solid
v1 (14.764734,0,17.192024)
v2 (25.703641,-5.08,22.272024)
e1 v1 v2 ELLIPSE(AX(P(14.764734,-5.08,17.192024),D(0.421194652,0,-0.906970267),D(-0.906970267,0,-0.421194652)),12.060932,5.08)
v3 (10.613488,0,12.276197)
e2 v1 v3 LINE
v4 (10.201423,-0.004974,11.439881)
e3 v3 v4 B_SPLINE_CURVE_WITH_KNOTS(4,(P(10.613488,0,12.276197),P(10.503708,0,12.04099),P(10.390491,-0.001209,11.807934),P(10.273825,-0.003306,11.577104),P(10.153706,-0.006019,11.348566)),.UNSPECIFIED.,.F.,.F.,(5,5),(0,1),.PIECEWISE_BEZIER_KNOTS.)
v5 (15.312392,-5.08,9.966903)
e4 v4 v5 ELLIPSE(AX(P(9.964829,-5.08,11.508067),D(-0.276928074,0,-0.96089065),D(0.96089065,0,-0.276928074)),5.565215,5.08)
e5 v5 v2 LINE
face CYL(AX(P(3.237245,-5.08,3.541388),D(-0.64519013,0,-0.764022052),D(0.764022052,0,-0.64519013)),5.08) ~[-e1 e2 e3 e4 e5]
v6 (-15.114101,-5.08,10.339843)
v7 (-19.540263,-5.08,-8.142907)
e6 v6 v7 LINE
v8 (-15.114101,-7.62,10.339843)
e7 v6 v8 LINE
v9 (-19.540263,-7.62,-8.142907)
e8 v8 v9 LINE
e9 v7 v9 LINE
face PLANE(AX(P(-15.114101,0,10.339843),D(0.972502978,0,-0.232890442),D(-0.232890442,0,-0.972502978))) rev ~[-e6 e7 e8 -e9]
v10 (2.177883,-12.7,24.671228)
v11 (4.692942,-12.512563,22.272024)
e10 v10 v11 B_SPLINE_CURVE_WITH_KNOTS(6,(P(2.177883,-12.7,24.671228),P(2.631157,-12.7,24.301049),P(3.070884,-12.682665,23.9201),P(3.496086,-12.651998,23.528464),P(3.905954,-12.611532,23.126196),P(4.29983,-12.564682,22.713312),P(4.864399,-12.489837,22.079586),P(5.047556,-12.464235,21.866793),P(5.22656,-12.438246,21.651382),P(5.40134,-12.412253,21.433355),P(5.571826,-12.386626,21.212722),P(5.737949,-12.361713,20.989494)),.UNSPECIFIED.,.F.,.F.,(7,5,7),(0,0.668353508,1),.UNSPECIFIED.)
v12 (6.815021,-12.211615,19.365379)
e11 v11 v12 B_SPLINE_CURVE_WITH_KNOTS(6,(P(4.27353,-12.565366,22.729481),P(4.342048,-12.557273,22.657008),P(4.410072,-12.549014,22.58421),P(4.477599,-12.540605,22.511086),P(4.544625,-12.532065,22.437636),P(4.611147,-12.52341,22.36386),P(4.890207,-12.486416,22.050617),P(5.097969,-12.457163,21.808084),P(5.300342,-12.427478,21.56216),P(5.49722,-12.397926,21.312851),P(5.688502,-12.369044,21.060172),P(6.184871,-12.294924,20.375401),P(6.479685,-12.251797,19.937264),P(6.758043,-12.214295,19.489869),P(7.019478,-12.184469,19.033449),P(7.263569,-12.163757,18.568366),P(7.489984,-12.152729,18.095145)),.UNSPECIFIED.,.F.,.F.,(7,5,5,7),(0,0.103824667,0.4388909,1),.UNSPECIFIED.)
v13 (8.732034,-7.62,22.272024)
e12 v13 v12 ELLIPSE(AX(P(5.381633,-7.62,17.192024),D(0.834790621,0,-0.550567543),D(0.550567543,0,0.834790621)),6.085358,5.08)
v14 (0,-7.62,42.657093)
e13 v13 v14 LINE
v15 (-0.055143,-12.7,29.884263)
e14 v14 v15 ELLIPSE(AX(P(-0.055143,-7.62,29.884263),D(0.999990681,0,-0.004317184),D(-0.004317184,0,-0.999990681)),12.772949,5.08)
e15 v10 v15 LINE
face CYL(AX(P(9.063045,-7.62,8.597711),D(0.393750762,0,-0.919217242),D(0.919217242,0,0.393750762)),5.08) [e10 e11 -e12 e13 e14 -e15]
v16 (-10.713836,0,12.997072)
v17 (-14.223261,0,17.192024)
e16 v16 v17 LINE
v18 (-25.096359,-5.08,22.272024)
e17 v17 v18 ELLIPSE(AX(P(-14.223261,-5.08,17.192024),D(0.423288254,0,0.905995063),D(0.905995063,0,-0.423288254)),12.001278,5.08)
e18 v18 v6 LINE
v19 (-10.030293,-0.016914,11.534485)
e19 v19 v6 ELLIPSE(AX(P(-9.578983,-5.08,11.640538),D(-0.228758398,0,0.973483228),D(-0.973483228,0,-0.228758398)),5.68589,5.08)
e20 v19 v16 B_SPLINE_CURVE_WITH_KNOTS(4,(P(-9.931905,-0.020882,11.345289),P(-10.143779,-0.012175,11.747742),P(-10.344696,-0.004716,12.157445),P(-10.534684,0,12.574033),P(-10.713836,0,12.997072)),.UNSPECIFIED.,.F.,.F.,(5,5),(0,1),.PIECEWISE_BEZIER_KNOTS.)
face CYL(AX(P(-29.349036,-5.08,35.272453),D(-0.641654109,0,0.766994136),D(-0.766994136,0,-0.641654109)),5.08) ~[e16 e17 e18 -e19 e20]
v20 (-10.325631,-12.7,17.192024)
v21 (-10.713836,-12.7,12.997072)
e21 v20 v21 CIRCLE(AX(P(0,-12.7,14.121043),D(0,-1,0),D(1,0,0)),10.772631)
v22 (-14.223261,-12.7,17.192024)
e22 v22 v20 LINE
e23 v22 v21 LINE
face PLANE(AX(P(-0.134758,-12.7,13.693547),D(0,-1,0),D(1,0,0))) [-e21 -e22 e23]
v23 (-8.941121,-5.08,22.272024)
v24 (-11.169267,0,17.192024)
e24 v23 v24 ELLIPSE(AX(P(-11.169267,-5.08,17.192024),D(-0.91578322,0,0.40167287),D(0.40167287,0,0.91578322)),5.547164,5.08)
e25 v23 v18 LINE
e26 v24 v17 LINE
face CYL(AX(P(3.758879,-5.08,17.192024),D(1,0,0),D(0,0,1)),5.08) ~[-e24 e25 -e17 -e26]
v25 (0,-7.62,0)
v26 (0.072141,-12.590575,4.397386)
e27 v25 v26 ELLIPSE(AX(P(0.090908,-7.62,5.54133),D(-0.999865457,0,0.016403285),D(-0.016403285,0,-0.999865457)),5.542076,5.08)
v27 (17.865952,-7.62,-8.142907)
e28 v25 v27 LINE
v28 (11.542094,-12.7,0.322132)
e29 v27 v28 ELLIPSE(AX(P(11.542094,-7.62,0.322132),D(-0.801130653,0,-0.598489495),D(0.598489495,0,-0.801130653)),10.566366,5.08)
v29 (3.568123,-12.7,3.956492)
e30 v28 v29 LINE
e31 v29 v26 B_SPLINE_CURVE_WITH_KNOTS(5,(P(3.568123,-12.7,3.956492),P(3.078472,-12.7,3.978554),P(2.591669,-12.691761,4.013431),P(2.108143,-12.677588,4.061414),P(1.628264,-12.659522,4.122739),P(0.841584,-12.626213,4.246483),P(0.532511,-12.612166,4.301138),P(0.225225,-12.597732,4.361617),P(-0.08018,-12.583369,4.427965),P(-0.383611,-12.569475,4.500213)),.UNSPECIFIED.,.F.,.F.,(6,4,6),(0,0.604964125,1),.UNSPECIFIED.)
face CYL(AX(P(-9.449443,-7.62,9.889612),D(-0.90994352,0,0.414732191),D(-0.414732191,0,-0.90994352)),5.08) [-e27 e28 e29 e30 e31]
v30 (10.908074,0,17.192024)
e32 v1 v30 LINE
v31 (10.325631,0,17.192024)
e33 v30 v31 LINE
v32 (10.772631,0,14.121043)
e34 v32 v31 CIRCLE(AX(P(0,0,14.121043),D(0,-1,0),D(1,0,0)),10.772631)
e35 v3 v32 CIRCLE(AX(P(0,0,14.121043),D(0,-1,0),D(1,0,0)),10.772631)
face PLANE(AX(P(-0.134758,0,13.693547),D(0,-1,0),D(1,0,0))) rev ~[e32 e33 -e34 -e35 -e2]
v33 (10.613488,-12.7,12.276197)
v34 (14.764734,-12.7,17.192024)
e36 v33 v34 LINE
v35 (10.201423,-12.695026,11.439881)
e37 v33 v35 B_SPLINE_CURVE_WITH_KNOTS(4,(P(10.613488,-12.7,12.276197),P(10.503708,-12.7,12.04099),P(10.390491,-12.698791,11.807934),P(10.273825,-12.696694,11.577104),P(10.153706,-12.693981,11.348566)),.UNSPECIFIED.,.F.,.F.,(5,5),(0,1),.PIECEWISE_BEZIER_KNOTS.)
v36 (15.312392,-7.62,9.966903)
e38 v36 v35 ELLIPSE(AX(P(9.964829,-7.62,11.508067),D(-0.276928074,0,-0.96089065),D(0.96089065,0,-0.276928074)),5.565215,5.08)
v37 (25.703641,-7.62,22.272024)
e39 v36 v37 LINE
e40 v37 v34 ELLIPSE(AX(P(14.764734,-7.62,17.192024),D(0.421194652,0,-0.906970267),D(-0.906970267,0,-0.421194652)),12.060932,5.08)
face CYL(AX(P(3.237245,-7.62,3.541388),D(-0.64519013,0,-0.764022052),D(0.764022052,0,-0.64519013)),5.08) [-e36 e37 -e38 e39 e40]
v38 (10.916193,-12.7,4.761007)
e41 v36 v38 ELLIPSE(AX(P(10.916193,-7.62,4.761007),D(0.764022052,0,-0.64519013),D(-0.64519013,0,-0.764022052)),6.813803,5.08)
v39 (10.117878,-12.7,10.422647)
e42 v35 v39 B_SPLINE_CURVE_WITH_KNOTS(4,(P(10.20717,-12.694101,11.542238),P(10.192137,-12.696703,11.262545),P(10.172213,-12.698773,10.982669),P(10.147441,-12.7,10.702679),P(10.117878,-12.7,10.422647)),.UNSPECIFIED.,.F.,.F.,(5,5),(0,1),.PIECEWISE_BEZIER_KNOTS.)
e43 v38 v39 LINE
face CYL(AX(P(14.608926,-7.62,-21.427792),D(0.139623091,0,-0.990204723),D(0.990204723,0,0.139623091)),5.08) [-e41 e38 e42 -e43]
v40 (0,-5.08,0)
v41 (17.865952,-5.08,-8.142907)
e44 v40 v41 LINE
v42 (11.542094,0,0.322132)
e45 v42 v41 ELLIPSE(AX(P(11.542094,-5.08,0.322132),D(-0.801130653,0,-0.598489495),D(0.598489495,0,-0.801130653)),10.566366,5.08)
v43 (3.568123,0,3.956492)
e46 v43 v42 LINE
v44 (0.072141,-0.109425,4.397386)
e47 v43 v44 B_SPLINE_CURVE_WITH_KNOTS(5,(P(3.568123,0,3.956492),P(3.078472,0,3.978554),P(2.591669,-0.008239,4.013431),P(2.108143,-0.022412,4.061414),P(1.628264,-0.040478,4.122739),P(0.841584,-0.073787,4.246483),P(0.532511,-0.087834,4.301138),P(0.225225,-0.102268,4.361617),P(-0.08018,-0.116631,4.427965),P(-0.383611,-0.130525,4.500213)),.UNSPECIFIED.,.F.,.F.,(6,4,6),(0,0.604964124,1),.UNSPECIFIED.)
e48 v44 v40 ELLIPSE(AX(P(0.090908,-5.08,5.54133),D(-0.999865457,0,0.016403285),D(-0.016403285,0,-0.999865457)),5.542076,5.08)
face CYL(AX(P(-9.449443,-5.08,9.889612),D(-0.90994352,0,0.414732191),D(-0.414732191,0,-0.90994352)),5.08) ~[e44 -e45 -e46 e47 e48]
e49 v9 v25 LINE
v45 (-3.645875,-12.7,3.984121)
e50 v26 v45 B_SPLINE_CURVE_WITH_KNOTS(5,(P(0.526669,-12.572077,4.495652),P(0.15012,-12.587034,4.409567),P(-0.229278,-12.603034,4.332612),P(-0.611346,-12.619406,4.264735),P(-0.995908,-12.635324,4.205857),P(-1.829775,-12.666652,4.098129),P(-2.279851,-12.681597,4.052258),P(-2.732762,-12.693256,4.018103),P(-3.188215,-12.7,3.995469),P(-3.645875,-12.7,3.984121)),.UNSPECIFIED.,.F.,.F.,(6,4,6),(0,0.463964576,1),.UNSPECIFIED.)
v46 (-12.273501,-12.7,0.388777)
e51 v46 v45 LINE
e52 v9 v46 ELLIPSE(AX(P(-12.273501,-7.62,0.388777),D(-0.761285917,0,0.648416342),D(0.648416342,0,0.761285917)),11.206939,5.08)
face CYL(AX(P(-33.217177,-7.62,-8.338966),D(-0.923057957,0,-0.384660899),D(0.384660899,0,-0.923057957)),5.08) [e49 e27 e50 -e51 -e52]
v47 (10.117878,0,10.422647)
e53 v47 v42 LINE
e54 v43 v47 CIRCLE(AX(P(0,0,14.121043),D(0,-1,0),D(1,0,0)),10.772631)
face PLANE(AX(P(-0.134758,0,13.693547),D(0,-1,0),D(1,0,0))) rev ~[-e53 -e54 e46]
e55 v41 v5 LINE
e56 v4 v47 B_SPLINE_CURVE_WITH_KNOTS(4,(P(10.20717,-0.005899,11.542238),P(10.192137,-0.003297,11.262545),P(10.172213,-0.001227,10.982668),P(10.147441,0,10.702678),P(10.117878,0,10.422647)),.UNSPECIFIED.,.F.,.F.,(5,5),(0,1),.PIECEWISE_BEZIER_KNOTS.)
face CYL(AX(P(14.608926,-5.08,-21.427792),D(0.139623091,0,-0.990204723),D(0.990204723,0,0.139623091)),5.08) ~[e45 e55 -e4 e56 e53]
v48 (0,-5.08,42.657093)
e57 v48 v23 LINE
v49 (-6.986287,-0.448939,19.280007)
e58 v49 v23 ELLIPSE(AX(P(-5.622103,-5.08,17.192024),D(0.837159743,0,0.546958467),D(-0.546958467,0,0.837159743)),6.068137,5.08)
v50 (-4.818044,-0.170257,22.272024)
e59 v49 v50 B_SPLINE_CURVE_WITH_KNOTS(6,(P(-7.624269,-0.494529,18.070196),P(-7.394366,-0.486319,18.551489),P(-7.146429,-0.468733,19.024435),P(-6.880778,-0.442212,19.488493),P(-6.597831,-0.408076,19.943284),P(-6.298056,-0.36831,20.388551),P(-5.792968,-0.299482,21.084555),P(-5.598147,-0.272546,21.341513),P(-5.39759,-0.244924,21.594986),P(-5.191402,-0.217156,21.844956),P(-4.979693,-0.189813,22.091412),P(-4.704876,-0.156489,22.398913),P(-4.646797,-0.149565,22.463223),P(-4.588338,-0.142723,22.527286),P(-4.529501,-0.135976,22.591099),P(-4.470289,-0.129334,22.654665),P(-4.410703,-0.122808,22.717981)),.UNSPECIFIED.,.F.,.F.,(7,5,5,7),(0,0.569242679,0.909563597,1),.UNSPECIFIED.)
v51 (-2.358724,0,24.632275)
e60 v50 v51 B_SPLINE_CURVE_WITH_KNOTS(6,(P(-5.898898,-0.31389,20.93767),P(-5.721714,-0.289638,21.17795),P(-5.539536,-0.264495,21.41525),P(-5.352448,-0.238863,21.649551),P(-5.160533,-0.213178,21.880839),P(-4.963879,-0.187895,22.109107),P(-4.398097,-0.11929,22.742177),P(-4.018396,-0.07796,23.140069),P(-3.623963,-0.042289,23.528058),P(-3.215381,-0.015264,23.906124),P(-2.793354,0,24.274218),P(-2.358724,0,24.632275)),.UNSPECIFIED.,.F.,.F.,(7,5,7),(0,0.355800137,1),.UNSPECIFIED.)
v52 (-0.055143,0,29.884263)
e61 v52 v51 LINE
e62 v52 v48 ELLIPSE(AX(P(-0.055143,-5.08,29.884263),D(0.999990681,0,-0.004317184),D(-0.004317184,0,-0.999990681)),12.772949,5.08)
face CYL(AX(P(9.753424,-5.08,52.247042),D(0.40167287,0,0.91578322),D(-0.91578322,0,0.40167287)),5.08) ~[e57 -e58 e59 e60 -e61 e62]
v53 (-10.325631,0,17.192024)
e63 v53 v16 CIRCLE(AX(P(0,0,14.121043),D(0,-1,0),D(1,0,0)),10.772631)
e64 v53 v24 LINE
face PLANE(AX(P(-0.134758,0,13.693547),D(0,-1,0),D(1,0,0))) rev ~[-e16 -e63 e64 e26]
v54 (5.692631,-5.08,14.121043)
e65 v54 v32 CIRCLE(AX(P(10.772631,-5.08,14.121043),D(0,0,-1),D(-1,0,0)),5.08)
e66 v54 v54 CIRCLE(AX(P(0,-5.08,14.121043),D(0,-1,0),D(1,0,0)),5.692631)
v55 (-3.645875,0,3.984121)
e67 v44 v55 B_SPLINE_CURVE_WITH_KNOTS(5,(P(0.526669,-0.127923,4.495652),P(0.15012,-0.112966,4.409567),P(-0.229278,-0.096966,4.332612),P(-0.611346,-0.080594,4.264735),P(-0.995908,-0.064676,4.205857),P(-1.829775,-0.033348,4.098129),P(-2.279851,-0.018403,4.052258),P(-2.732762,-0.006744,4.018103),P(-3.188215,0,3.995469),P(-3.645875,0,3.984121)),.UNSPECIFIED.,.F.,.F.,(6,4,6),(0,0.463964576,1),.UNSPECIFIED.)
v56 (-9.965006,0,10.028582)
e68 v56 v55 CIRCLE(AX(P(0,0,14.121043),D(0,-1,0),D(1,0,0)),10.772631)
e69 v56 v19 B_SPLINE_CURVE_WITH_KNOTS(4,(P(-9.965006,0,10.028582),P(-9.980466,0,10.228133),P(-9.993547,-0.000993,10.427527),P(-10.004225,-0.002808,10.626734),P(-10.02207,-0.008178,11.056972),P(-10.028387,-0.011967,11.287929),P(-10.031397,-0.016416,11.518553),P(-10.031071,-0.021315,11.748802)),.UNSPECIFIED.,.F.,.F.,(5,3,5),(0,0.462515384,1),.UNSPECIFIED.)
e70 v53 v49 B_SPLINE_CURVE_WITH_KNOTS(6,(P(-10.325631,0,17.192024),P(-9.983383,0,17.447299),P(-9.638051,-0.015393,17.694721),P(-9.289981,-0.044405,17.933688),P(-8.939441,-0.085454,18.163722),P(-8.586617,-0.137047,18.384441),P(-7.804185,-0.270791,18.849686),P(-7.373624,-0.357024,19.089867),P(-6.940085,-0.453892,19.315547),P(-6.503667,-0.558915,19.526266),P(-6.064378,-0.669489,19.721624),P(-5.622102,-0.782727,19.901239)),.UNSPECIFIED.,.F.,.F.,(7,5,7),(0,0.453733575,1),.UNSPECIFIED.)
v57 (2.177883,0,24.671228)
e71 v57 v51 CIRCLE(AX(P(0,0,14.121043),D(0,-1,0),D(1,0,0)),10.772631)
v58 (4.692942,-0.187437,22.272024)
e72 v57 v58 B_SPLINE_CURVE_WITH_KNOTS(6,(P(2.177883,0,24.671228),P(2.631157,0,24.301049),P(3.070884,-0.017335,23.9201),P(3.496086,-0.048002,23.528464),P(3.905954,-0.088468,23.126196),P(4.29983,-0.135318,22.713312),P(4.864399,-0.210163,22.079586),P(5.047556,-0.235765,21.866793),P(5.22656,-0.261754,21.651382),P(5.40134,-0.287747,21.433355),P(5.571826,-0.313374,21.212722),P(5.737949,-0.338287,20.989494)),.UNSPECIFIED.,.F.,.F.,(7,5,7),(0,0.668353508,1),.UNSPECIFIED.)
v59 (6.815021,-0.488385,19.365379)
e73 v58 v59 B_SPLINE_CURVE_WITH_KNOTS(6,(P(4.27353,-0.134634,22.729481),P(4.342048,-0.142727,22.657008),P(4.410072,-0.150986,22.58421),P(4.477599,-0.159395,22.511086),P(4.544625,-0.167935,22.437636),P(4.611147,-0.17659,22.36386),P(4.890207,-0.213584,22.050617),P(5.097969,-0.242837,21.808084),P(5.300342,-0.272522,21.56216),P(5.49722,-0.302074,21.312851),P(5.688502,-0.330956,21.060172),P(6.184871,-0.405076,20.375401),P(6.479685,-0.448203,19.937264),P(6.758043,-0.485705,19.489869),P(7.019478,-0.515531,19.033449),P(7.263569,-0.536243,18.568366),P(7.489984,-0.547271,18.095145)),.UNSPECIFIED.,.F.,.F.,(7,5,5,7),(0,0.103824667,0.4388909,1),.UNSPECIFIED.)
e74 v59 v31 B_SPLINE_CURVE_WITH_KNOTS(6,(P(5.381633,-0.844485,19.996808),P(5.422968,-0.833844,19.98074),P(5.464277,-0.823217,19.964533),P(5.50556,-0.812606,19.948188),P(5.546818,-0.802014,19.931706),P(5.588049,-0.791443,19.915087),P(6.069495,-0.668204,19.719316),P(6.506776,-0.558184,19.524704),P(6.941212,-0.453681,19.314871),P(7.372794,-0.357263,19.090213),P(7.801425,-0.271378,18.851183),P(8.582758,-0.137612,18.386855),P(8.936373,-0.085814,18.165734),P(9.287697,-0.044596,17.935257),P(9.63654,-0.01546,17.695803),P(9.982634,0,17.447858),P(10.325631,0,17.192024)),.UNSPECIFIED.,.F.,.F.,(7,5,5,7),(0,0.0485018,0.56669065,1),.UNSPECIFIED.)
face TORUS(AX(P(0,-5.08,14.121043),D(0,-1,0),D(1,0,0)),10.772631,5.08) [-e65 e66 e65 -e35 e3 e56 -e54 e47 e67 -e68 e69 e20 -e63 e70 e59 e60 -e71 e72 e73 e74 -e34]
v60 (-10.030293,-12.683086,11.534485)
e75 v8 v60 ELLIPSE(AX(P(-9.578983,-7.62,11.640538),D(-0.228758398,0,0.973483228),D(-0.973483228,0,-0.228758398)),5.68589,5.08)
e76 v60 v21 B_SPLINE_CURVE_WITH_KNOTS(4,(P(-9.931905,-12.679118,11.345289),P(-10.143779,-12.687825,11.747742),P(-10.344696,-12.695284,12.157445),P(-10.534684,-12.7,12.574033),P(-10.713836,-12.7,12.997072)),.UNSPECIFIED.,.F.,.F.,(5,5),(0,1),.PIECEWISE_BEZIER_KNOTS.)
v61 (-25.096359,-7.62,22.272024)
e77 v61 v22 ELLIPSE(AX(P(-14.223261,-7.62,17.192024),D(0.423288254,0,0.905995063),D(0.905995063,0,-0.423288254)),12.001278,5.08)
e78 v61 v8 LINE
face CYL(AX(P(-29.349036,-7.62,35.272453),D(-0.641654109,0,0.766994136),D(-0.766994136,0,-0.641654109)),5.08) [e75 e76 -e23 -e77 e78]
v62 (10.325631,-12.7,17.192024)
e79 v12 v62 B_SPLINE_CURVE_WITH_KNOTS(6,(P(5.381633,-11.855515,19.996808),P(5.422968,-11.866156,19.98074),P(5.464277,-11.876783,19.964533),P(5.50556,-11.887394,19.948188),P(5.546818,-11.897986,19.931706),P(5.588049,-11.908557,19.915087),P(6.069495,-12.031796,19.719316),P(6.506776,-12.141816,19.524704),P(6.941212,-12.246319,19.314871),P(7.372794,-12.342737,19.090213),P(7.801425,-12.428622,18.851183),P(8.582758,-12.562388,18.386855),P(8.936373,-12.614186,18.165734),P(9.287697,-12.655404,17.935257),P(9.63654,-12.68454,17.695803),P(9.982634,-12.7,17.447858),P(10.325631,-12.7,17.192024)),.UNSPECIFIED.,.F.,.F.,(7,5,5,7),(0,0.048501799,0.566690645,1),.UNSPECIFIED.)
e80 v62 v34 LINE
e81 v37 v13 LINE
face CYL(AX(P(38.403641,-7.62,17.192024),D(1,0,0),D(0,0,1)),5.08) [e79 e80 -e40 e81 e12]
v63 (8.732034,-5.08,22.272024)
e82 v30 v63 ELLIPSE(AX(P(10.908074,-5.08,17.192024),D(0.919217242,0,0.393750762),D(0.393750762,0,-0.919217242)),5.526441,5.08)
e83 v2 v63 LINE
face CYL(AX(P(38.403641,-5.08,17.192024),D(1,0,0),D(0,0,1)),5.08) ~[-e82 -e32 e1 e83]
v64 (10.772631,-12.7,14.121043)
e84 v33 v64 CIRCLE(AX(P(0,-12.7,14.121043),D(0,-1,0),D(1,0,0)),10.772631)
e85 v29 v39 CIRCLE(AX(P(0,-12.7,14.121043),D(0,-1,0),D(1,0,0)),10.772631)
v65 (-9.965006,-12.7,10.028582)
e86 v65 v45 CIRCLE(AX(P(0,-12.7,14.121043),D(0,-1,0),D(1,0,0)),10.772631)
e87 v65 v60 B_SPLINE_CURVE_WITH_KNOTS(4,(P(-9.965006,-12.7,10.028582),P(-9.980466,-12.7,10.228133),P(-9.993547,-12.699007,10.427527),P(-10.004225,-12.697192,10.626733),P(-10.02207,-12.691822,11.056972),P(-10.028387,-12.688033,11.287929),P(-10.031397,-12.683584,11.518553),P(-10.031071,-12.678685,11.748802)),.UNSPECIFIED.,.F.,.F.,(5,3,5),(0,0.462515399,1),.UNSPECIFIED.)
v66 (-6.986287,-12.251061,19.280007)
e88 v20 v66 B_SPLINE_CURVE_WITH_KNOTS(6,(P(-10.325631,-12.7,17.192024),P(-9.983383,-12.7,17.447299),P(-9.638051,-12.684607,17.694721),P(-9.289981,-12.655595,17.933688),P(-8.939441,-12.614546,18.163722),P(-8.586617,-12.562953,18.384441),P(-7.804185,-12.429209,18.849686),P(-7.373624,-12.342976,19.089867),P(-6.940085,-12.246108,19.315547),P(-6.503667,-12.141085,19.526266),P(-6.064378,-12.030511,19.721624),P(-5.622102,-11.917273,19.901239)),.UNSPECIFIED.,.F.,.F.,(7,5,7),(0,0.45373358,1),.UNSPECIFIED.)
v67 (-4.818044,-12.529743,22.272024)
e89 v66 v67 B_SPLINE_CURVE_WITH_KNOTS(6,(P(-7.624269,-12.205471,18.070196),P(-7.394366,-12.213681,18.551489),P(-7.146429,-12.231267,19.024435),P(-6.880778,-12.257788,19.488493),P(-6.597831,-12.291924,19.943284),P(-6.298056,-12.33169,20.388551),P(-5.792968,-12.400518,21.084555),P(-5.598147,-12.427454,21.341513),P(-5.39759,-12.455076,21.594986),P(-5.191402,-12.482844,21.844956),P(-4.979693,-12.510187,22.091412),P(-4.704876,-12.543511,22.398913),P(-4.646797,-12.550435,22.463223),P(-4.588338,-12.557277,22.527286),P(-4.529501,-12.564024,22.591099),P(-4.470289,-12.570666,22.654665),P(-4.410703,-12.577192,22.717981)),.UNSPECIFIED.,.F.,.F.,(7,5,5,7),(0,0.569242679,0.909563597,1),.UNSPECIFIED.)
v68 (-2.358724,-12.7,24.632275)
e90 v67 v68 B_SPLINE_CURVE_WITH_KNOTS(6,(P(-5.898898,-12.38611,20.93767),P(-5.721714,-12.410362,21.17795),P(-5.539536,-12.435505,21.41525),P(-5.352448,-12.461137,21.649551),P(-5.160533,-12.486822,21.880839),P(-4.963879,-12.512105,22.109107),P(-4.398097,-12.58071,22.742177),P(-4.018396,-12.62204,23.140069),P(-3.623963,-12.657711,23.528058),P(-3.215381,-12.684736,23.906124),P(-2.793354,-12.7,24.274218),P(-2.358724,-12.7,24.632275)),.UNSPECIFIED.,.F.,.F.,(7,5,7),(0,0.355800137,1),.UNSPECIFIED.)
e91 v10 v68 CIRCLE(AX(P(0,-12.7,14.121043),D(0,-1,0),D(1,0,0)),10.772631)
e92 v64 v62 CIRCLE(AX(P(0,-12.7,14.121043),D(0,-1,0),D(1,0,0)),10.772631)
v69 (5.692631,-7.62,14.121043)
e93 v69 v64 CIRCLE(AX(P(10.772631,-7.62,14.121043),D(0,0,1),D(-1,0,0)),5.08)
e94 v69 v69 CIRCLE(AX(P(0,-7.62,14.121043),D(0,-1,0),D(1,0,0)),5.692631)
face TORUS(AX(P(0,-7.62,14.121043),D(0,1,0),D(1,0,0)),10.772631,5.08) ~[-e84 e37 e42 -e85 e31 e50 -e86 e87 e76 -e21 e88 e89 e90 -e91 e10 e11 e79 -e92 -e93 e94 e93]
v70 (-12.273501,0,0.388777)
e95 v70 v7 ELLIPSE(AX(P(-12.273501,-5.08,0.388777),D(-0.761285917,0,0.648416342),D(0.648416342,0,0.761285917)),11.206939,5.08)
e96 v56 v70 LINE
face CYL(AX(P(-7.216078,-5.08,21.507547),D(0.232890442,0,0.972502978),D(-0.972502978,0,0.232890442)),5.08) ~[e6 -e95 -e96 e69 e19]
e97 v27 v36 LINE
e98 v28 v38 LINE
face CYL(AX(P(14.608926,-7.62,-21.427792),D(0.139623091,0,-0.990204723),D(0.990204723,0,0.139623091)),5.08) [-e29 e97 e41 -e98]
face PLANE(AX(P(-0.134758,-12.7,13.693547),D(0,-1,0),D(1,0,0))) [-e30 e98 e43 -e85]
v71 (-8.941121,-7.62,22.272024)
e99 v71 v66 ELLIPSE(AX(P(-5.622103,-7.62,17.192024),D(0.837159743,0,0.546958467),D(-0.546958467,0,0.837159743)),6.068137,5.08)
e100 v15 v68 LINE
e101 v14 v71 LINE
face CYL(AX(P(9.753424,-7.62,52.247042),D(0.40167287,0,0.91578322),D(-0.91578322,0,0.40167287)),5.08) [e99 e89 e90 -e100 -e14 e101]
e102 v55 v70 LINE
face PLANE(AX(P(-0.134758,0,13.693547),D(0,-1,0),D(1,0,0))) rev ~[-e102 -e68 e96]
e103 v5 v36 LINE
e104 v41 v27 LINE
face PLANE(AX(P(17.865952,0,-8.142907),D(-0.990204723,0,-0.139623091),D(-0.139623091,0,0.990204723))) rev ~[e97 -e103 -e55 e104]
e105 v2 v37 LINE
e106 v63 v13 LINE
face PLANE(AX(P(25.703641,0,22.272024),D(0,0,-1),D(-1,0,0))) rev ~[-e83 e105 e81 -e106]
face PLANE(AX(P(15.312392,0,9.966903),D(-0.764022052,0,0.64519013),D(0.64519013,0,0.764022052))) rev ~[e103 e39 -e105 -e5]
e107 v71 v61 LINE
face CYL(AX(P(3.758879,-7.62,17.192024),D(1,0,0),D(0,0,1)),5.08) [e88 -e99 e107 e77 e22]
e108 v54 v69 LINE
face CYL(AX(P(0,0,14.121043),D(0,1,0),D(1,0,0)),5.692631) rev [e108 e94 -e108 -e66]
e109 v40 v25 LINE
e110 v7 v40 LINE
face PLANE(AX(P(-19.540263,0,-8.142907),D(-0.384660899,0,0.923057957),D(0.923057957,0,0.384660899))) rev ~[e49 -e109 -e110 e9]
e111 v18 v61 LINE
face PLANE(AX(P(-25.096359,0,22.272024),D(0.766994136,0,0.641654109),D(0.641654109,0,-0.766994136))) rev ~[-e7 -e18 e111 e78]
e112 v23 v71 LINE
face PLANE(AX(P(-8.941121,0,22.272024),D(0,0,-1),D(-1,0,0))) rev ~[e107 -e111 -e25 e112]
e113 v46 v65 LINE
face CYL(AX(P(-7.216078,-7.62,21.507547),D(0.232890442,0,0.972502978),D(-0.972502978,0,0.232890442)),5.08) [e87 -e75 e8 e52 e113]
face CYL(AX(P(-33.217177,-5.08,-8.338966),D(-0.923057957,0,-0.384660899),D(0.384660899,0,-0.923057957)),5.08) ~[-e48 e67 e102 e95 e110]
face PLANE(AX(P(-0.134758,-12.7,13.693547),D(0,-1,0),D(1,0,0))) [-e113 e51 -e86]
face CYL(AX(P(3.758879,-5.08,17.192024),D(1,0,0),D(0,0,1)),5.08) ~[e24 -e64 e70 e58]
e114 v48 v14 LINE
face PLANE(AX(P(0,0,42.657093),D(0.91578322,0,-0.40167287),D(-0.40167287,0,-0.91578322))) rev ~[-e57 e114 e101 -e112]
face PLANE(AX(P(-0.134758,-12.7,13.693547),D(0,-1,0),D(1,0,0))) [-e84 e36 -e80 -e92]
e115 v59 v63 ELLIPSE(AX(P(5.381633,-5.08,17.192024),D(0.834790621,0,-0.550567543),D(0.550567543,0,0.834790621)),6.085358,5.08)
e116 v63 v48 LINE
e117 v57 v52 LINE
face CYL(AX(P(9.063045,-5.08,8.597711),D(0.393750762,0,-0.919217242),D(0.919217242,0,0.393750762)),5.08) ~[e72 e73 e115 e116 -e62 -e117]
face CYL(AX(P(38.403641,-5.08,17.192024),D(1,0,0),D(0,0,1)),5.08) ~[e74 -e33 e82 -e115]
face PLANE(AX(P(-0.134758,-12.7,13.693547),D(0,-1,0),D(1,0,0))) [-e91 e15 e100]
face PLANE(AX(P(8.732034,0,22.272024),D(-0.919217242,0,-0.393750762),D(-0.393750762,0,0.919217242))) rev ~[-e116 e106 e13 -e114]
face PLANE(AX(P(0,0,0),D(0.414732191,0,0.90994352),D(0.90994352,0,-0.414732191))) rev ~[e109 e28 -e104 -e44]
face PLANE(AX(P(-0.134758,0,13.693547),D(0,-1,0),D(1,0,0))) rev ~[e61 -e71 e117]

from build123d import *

# Parameters (mm, degrees)
F0_R          = 5.6926313443
F1_DEPTH      = 12.7
F2_T4_DEPTH   = 43.6889551243
F2_T9_DEPTH   = 41.5057154141
F2_T14_DEPTH  = 42.3716066055
F2_T19_DEPTH  = 47.5765515209
F2_T24_DEPTH  = 47.6597095959
F2_T29_DEPTH  = 41.5552379071
F2_T34_DEPTH  = 40.9570702629
F2_T39_DEPTH  = 44.4053400631
F2_T44_DEPTH  = 46.5690535596
F2_T49_DEPTH  = 45.0341334131
F2_T56_DEPTH  = 43.6889551243
F2_T61_DEPTH  = 41.5057154141
F2_T66_DEPTH  = 42.3716066055
F2_T71_DEPTH  = 47.5765515209
F2_T76_DEPTH  = 47.6597095959
F2_T81_DEPTH  = 41.5552379071
F2_T86_DEPTH  = 40.9570702629
F2_T91_DEPTH  = 44.4053400631
F2_T96_DEPTH  = 46.5690535596
F2_T101_DEPTH = 45.0341334131
F2_T109_DEPTH = 43.6889551243
F2_T113_DEPTH = 41.5057154141
F2_T120_DEPTH = 42.3716066055
F2_T124_DEPTH = 47.5765515209
F2_T131_DEPTH = 47.6597095959
F2_T135_DEPTH = 41.5552379071
F2_T142_DEPTH = 40.9570702629
F2_T146_DEPTH = 44.4053400631
F2_T153_DEPTH = 46.5690535596
F2_T157_DEPTH = 45.0341334131
F2_T164_DEPTH = 43.6889551243
F2_T168_DEPTH = 41.5057154141
F2_T175_DEPTH = 42.3716066055
F2_T179_DEPTH = 47.5765515209
F2_T186_DEPTH = 47.6597095959
F2_T190_DEPTH = 41.5552379071
F2_T197_DEPTH = 40.9570702629
F2_T201_DEPTH = 44.4053400631
F2_T208_DEPTH = 46.5690535596
F2_T212_DEPTH = 45.0341334131


# Not quite as in the source:
# - a fillet or chamfer that OpenCascade refuses, or shapes differently, is made with other operations: its cross-section is extruded or revolved along the edge and cut away or added


with BuildPart() as f1:
    # F0 (on Front) → F1 (new body)
    with BuildSketch(Plane.XZ):
        Polygon((25.7036406547, 22.2720243037), (8.7320340492, 22.2720243037), (0, 42.6570928276), (-8.9411214382, 22.2720243037), (-25.0963593453, 22.2720243037), (-15.1141012942, 10.3398426354), (-19.5402633399, -8.1429071724), (0, 0), (17.8659524701, -8.1429071724), (15.3123920323, 9.9669025623), align=None)
        with Locations((0, 14.1210428621)):
            Circle(F0_R, mode=Mode.SUBTRACT)
    extrude(amount=F1_DEPTH)

    # F2: fillet of radius 5.08 on 22 edges, made by hand


with BuildPart() as f2_tool2:
    # F2_s3 → F2_t4 (new body)
    with BuildSketch(Plane(origin=(3.2473042237, 0, -23.0298295556), x_dir=(0, 1, 0), z_dir=(-0.1396230906, 0, 0.9902047226))):
        with BuildLine():
            ThreePointArc((-7.62, -16.5540126433), (-11.2121024484, -15.0661150917), (-12.7, -11.4740126433))
            Line((-12.7, -11.4740126433), (-12.7, -16.5540126433))
            Line((-12.7, -16.5540126433), (-7.62, -16.5540126433))
        make_face()
    extrude(amount=F2_T4_DEPTH)

    split(bisect_by=Plane(origin=(4.0252181101, 0, -3.3991571169), x_dir=(0, 1, 0), z_dir=(0.7640220521, 0, -0.64519013)), keep=Keep.TOP)


with BuildPart() as f1_1:
    add(f1.part)

    # F2_t1: cut F2_tool2
    add(f2_tool2.part, mode=Mode.SUBTRACT)


with BuildPart() as f2_tool7:
    # F2_s8 → F2_t9 (new body)
    with BuildSketch(Plane(origin=(3.0932592707, 0, 3.6629796175), x_dir=(0, 1, 0), z_dir=(0.64519013, 0, 0.7640220521))):
        with BuildLine():
            ThreePointArc((-7.62, -5.2684580229), (-11.2121024484, -3.7805604713), (-12.7, -0.1884580229))
            Line((-12.7, -0.1884580229), (-12.7, -5.2684580229))
            Line((-12.7, -5.2684580229), (-7.62, -5.2684580229))
        make_face()
    extrude(amount=F2_T9_DEPTH)

    split(bisect_by=Plane(origin=(16.3918614967, 0, 2.3113224066), x_dir=(0, 1, 0), z_dir=(0.9902047226, 0, 0.1396230906)), keep=Keep.TOP)


with BuildPart() as f1_2:
    add(f1_1.part)

    # F2_t6: cut F2_tool7
    add(f2_tool7.part, mode=Mode.SUBTRACT)


with BuildPart() as f2_tool12:
    # F2_s13 → F2_t14 (new body)
    with BuildSketch(Plane.YZ.offset(38.4036406547)):
        with BuildLine():
            ThreePointArc((-7.62, 22.2720243037), (-11.2121024484, 20.7841267521), (-12.7, 17.1920243037))
            Line((-12.7, 17.1920243037), (-12.7, 22.2720243037))
            Line((-12.7, 22.2720243037), (-7.62, 22.2720243037))
        make_face()
    extrude(amount=-F2_T14_DEPTH)

    split(bisect_by=Plane(origin=(15.4394143514, 0, 6.6135412622), x_dir=(0, 1, 0), z_dir=(0.9192172419, 0, 0.3937507615)), keep=Keep.TOP)


with BuildPart() as f1_3:
    add(f1_2.part)

    # F2_t11: cut F2_tool12
    add(f2_tool12.part, mode=Mode.SUBTRACT)


with BuildPart() as f2_tool17:
    # F2_s18 → F2_t19 (new body)
    with BuildSketch(Plane(origin=(-1.706745631, 0, 3.9844240694), x_dir=(0, 1, 0), z_dir=(-0.3937507615, 0, 0.9192172419))):
        with BuildLine():
            ThreePointArc((-7.62, -16.7962627849), (-11.2121024484, -15.3083652333), (-12.7, -11.7162627849))
            Line((-12.7, -11.7162627849), (-12.7, -16.7962627849))
            Line((-12.7, -16.7962627849), (-7.62, -16.7962627849))
        make_face()
    extrude(amount=F2_T19_DEPTH)

    split(bisect_by=Plane.XY.offset(22.2720243037), keep=Keep.TOP)


with BuildPart() as f1_4:
    add(f1_3.part)

    # F2_t16: cut F2_tool17
    add(f2_tool17.part, mode=Mode.SUBTRACT)


with BuildPart() as f2_tool22:
    # F2_s23 → F2_t24 (new body)
    with BuildSketch(Plane(origin=(20.7924554538, 0, 47.4051976742), x_dir=(0, 1, 0), z_dir=(-0.40167287, 0, -0.9157832197))):
        with BuildLine():
            ThreePointArc((-7.62, -17.1341969008), (-11.2121024484, -15.6462993492), (-12.7, -12.0541969008))
            Line((-12.7, -12.0541969008), (-12.7, -17.1341969008))
            Line((-12.7, -17.1341969008), (-7.62, -17.1341969008))
        make_face()
    extrude(amount=F2_T24_DEPTH)

    split(bisect_by=Plane.XY.offset(22.2720243037), keep=Keep.TOP)


with BuildPart() as f1_5:
    add(f1_4.part)

    # F2_t21: cut F2_tool22
    add(f2_tool22.part, mode=Mode.SUBTRACT)


with BuildPart() as f2_tool27:
    # F2_s28 → F2_t29 (new body)
    with BuildSketch(Plane.YZ.offset(3.7588785618)):
        with BuildLine():
            ThreePointArc((-7.62, 22.2720243037), (-11.2121024484, 20.7841267521), (-12.7, 17.1920243037))
            Line((-12.7, 17.1920243037), (-12.7, 22.2720243037))
            Line((-12.7, 22.2720243037), (-7.62, 22.2720243037))
        make_face()
    extrude(amount=-F2_T29_DEPTH)

    split(bisect_by=Plane(origin=(-15.6912100052, 0, 6.8823420438), x_dir=(0, 1, 0), z_dir=(-0.9157832197, 0, 0.40167287)), keep=Keep.TOP)


with BuildPart() as f1_6:
    add(f1_5.part)

    # F2_t26: cut F2_tool27
    add(f2_tool27.part, mode=Mode.SUBTRACT)


with BuildPart() as f2_tool32:
    # F2_s33 → F2_t34 (new body)
    with BuildSketch(Plane(origin=(-29.4427441593, 0, 35.1940583308), x_dir=(0, 1, 0), z_dir=(0.6416541085, 0, -0.7669941362))):
        with BuildLine():
            ThreePointArc((-7.62, -4.9578245582), (-11.2121024484, -3.4699270066), (-12.7, 0.1221754418))
            Line((-12.7, 0.1221754418), (-12.7, -4.9578245582))
            Line((-12.7, -4.9578245582), (-7.62, -4.9578245582))
        make_face()
    extrude(amount=F2_T34_DEPTH)

    split(bisect_by=Plane(origin=(-16.6361796063, 0, 3.9839540936), x_dir=(0, 1, 0), z_dir=(-0.9725029779, 0, 0.2328904419)), keep=Keep.TOP)


with BuildPart() as f1_7:
    add(f1_6.part)

    # F2_t31: cut F2_tool32
    add(f2_tool32.part, mode=Mode.SUBTRACT)


with BuildPart() as f2_tool37:
    # F2_s38 → F2_t39 (new body)
    with BuildSketch(Plane(origin=(4.4797869241, 0, 18.7066763614), x_dir=(0, 1, 0), z_dir=(-0.2328904419, 0, -0.9725029779))):
        with BuildLine():
            ThreePointArc((-7.62, -17.1065590378), (-11.2121024484, -15.6186614862), (-12.7, -12.0265590378))
            Line((-12.7, -12.0265590378), (-12.7, -17.1065590378))
            Line((-12.7, -17.1065590378), (-7.62, -17.1065590378))
        make_face()
    extrude(amount=F2_T39_DEPTH)

    split(bisect_by=Plane(origin=(-3.8026223645, 0, -3.1812084972), x_dir=(0, 1, 0), z_dir=(-0.7669941362, 0, -0.6416541085)), keep=Keep.TOP)


with BuildPart() as f1_8:
    add(f1_7.part)

    # F2_t36: cut F2_tool37
    add(f2_tool37.part, mode=Mode.SUBTRACT)


with BuildPart() as f2_tool42:
    # F2_s43 → F2_t44 (new body)
    with BuildSketch(Plane(origin=(-31.2630993995, 0, -13.0281005893), x_dir=(0, 1, 0), z_dir=(0.9230579574, 0, 0.384660899))):
        with BuildLine():
            ThreePointArc((-7.62, 0), (-11.2121024484, 1.4878975516), (-12.7, 5.08))
            Line((-12.7, 5.08), (-12.7, 0))
            Line((-12.7, 0), (-7.62, 0))
        make_face()
    extrude(amount=F2_T44_DEPTH)

    split(bisect_by=Plane(origin=(0, 0, 0), x_dir=(0, 1, 0), z_dir=(-0.4147321912, 0, -0.90994352)), keep=Keep.TOP)


with BuildPart() as f1_9:
    add(f1_8.part)

    # F2_t41: cut F2_tool42
    add(f2_tool42.part, mode=Mode.SUBTRACT)


with BuildPart() as f2_tool47:
    # F2_s48 → F2_t49 (new body)
    with BuildSketch(Plane(origin=(-11.556282704, 0, 5.2670988281), x_dir=(0, 1, 0), z_dir=(0.90994352, 0, -0.4147321912))):
        with BuildLine():
            ThreePointArc((-7.62, 0), (-11.2121024484, 1.4878975516), (-12.7, 5.08))
            Line((-12.7, 5.08), (-12.7, 0))
            Line((-12.7, 0), (-7.62, 0))
        make_face()
    extrude(amount=F2_T49_DEPTH)

    split(bisect_by=Plane(origin=(0, 0, 0), x_dir=(0, 1, 0), z_dir=(0.384660899, 0, -0.9230579574)), keep=Keep.TOP)


with BuildPart() as f1_10:
    add(f1_9.part)

    # F2_t46: cut F2_tool47
    add(f2_tool47.part, mode=Mode.SUBTRACT)

    # F2_s51 → F2_t52 (revolve, cut)
    with BuildSketch(Plane.XY.offset(14.1210428621)):
        with BuildLine():
            ThreePointArc((5.6926313443, -7.62), (7.1805288959, -11.2121024484), (10.7726313443, -12.7))
            Line((10.7726313443, -12.7), (5.6926313443, -12.7))
            Line((5.6926313443, -12.7), (5.6926313443, -7.62))
        make_face()
    revolve(axis=Axis((0, -12.7, 14.1210428621), (0, -1, 0)), mode=Mode.SUBTRACT)


with BuildPart() as f2_tool54:
    # F2_s55 → F2_t56 (new body)
    with BuildSketch(Plane(origin=(3.2473042237, 0, -23.0298295556), x_dir=(0, 1, 0), z_dir=(-0.1396230906, 0, 0.9902047226))):
        with BuildLine():
            ThreePointArc((-5.08, -16.5540126433), (-1.4878975516, -15.0661150917), (0, -11.4740126433))
            Line((0, -11.4740126433), (0, -16.5540126433))
            Line((0, -16.5540126433), (-5.08, -16.5540126433))
        make_face()
    extrude(amount=F2_T56_DEPTH)

    split(bisect_by=Plane(origin=(4.0252181101, 0, -3.3991571169), x_dir=(0, 1, 0), z_dir=(0.7640220521, 0, -0.64519013)), keep=Keep.TOP)


with BuildPart() as f1_11:
    add(f1_10.part)

    # F2_t53: cut F2_tool54
    add(f2_tool54.part, mode=Mode.SUBTRACT)


with BuildPart() as f2_tool59:
    # F2_s60 → F2_t61 (new body)
    with BuildSketch(Plane(origin=(3.0932592707, 0, 3.6629796175), x_dir=(0, 1, 0), z_dir=(0.64519013, 0, 0.7640220521))):
        with BuildLine():
            ThreePointArc((-5.08, -5.2684580229), (-1.4878975516, -3.7805604713), (0, -0.1884580229))
            Line((0, -0.1884580229), (0, -5.2684580229))
            Line((0, -5.2684580229), (-5.08, -5.2684580229))
        make_face()
    extrude(amount=F2_T61_DEPTH)

    split(bisect_by=Plane(origin=(16.3918614967, 0, 2.3113224066), x_dir=(0, 1, 0), z_dir=(0.9902047226, 0, 0.1396230906)), keep=Keep.TOP)


with BuildPart() as f1_12:
    add(f1_11.part)

    # F2_t58: cut F2_tool59
    add(f2_tool59.part, mode=Mode.SUBTRACT)


with BuildPart() as f2_tool64:
    # F2_s65 → F2_t66 (new body)
    with BuildSketch(Plane.YZ.offset(38.4036406547)):
        with BuildLine():
            ThreePointArc((-5.08, 22.2720243037), (-1.4878975516, 20.7841267521), (0, 17.1920243037))
            Line((0, 17.1920243037), (0, 22.2720243037))
            Line((0, 22.2720243037), (-5.08, 22.2720243037))
        make_face()
    extrude(amount=-F2_T66_DEPTH)

    split(bisect_by=Plane(origin=(15.4394143514, 0, 6.6135412622), x_dir=(0, 1, 0), z_dir=(0.9192172419, 0, 0.3937507615)), keep=Keep.TOP)


with BuildPart() as f1_13:
    add(f1_12.part)

    # F2_t63: cut F2_tool64
    add(f2_tool64.part, mode=Mode.SUBTRACT)


with BuildPart() as f2_tool69:
    # F2_s70 → F2_t71 (new body)
    with BuildSketch(Plane(origin=(-1.706745631, 0, 3.9844240694), x_dir=(0, 1, 0), z_dir=(-0.3937507615, 0, 0.9192172419))):
        with BuildLine():
            ThreePointArc((-5.08, -16.7962627849), (-1.4878975516, -15.3083652333), (0, -11.7162627849))
            Line((0, -11.7162627849), (0, -16.7962627849))
            Line((0, -16.7962627849), (-5.08, -16.7962627849))
        make_face()
    extrude(amount=F2_T71_DEPTH)

    split(bisect_by=Plane.XY.offset(22.2720243037), keep=Keep.TOP)


with BuildPart() as f1_14:
    add(f1_13.part)

    # F2_t68: cut F2_tool69
    add(f2_tool69.part, mode=Mode.SUBTRACT)


with BuildPart() as f2_tool74:
    # F2_s75 → F2_t76 (new body)
    with BuildSketch(Plane(origin=(20.7924554538, 0, 47.4051976742), x_dir=(0, 1, 0), z_dir=(-0.40167287, 0, -0.9157832197))):
        with BuildLine():
            ThreePointArc((-5.08, -17.1341969008), (-1.4878975516, -15.6462993492), (0, -12.0541969008))
            Line((0, -12.0541969008), (0, -17.1341969008))
            Line((0, -17.1341969008), (-5.08, -17.1341969008))
        make_face()
    extrude(amount=F2_T76_DEPTH)

    split(bisect_by=Plane.XY.offset(22.2720243037), keep=Keep.TOP)


with BuildPart() as f1_15:
    add(f1_14.part)

    # F2_t73: cut F2_tool74
    add(f2_tool74.part, mode=Mode.SUBTRACT)


with BuildPart() as f2_tool79:
    # F2_s80 → F2_t81 (new body)
    with BuildSketch(Plane.YZ.offset(3.7588785618)):
        with BuildLine():
            ThreePointArc((-5.08, 22.2720243037), (-1.4878975516, 20.7841267521), (0, 17.1920243037))
            Line((0, 17.1920243037), (0, 22.2720243037))
            Line((0, 22.2720243037), (-5.08, 22.2720243037))
        make_face()
    extrude(amount=-F2_T81_DEPTH)

    split(bisect_by=Plane(origin=(-15.6912100052, 0, 6.8823420438), x_dir=(0, 1, 0), z_dir=(-0.9157832197, 0, 0.40167287)), keep=Keep.TOP)


with BuildPart() as f1_16:
    add(f1_15.part)

    # F2_t78: cut F2_tool79
    add(f2_tool79.part, mode=Mode.SUBTRACT)


with BuildPart() as f2_tool84:
    # F2_s85 → F2_t86 (new body)
    with BuildSketch(Plane(origin=(-29.4427441593, 0, 35.1940583308), x_dir=(0, 1, 0), z_dir=(0.6416541085, 0, -0.7669941362))):
        with BuildLine():
            ThreePointArc((-5.08, -4.9578245582), (-1.4878975516, -3.4699270066), (0, 0.1221754418))
            Line((0, 0.1221754418), (0, -4.9578245582))
            Line((0, -4.9578245582), (-5.08, -4.9578245582))
        make_face()
    extrude(amount=F2_T86_DEPTH)

    split(bisect_by=Plane(origin=(-16.6361796063, 0, 3.9839540936), x_dir=(0, 1, 0), z_dir=(-0.9725029779, 0, 0.2328904419)), keep=Keep.TOP)


with BuildPart() as f1_17:
    add(f1_16.part)

    # F2_t83: cut F2_tool84
    add(f2_tool84.part, mode=Mode.SUBTRACT)


with BuildPart() as f2_tool89:
    # F2_s90 → F2_t91 (new body)
    with BuildSketch(Plane(origin=(4.4797869241, 0, 18.7066763614), x_dir=(0, 1, 0), z_dir=(-0.2328904419, 0, -0.9725029779))):
        with BuildLine():
            ThreePointArc((-5.08, -17.1065590378), (-1.4878975516, -15.6186614862), (0, -12.0265590378))
            Line((0, -12.0265590378), (0, -17.1065590378))
            Line((0, -17.1065590378), (-5.08, -17.1065590378))
        make_face()
    extrude(amount=F2_T91_DEPTH)

    split(bisect_by=Plane(origin=(-3.8026223645, 0, -3.1812084972), x_dir=(0, 1, 0), z_dir=(-0.7669941362, 0, -0.6416541085)), keep=Keep.TOP)


with BuildPart() as f1_18:
    add(f1_17.part)

    # F2_t88: cut F2_tool89
    add(f2_tool89.part, mode=Mode.SUBTRACT)


with BuildPart() as f2_tool94:
    # F2_s95 → F2_t96 (new body)
    with BuildSketch(Plane(origin=(-31.2630993995, 0, -13.0281005893), x_dir=(0, 1, 0), z_dir=(0.9230579574, 0, 0.384660899))):
        with BuildLine():
            ThreePointArc((-5.08, 0), (-1.4878975516, 1.4878975516), (0, 5.08))
            Line((0, 5.08), (0, 0))
            Line((0, 0), (-5.08, 0))
        make_face()
    extrude(amount=F2_T96_DEPTH)

    split(bisect_by=Plane(origin=(0, 0, 0), x_dir=(0, 1, 0), z_dir=(-0.4147321912, 0, -0.90994352)), keep=Keep.TOP)


with BuildPart() as f1_19:
    add(f1_18.part)

    # F2_t93: cut F2_tool94
    add(f2_tool94.part, mode=Mode.SUBTRACT)


with BuildPart() as f2_tool99:
    # F2_s100 → F2_t101 (new body)
    with BuildSketch(Plane(origin=(-11.556282704, 0, 5.2670988281), x_dir=(0, 1, 0), z_dir=(0.90994352, 0, -0.4147321912))):
        with BuildLine():
            ThreePointArc((-5.08, 0), (-1.4878975516, 1.4878975516), (0, 5.08))
            Line((0, 5.08), (0, 0))
            Line((0, 0), (-5.08, 0))
        make_face()
    extrude(amount=F2_T101_DEPTH)

    split(bisect_by=Plane(origin=(0, 0, 0), x_dir=(0, 1, 0), z_dir=(0.384660899, 0, -0.9230579574)), keep=Keep.TOP)


with BuildPart() as f1_20:
    add(f1_19.part)

    # F2_t98: cut F2_tool99
    add(f2_tool99.part, mode=Mode.SUBTRACT)

    # F2_s103 → F2_t104 (revolve, cut)
    with BuildSketch(Plane.XY.offset(14.1210428621)):
        with BuildLine():
            ThreePointArc((5.6926313443, -5.08), (7.1805288959, -1.4878975516), (10.7726313443, 0))
            Line((10.7726313443, 0), (5.6926313443, 0))
            Line((5.6926313443, 0), (5.6926313443, -5.08))
        make_face()
    revolve(axis=Axis((0, 0, 14.1210428621), (0, -1, 0)), mode=Mode.SUBTRACT)


with BuildPart() as f2_tool107:
    # F2_s108 → F2_t109 (new body)
    with BuildSketch(Plane(origin=(3.2473042237, 0, -23.0298295556), x_dir=(0, 1, 0), z_dir=(-0.1396230906, 0, 0.9902047226))):
        with BuildLine():
            ThreePointArc((-7.62, -16.5540126433), (-11.2121024484, -15.0661150917), (-12.7, -11.4740126433))
            Line((-12.7, -11.4740126433), (-12.7, -16.5540126433))
            Line((-12.7, -16.5540126433), (-7.62, -16.5540126433))
        make_face()
    extrude(amount=F2_T109_DEPTH)

    split(bisect_by=Plane(origin=(4.0252181101, 0, -3.3991571169), x_dir=(0, 1, 0), z_dir=(-0.7640220521, 0, 0.64519013)), keep=Keep.TOP)


with BuildPart() as f2_tool111:
    # F2_s112 → F2_t113 (new body)
    with BuildSketch(Plane(origin=(3.0932592707, 0, 3.6629796175), x_dir=(0, 1, 0), z_dir=(0.64519013, 0, 0.7640220521))):
        with BuildLine():
            ThreePointArc((-7.62, -5.2684580229), (-11.2121024484, -3.7805604713), (-12.7, -0.1884580229))
            Line((-12.7, -0.1884580229), (-12.7, -5.2684580229))
            Line((-12.7, -5.2684580229), (-7.62, -5.2684580229))
        make_face()
    extrude(amount=F2_T113_DEPTH)

    split(bisect_by=Plane(origin=(16.3918614967, 0, 2.3113224066), x_dir=(0, 1, 0), z_dir=(-0.9902047226, 0, -0.1396230906)), keep=Keep.TOP)


with BuildPart() as f2_tool107_1:
    add(f2_tool107.part)

    # F2_t115: intersect F2_tool111
    add(f2_tool111.part, mode=Mode.INTERSECT)


with BuildPart() as f1_21:
    add(f1_20.part)

    # F2_t105: cut F2_tool107
    add(f2_tool107_1.part, mode=Mode.SUBTRACT)


with BuildPart() as f2_tool118:
    # F2_s119 → F2_t120 (new body)
    with BuildSketch(Plane.YZ.offset(38.4036406547)):
        with BuildLine():
            ThreePointArc((-7.62, 22.2720243037), (-11.2121024484, 20.7841267521), (-12.7, 17.1920243037))
            Line((-12.7, 17.1920243037), (-12.7, 22.2720243037))
            Line((-12.7, 22.2720243037), (-7.62, 22.2720243037))
        make_face()
    extrude(amount=-F2_T120_DEPTH)

    split(bisect_by=Plane(origin=(15.4394143514, 0, 6.6135412622), x_dir=(0, 1, 0), z_dir=(-0.9192172419, 0, -0.3937507615)), keep=Keep.TOP)


with BuildPart() as f2_tool122:
    # F2_s123 → F2_t124 (new body)
    with BuildSketch(Plane(origin=(-1.706745631, 0, 3.9844240694), x_dir=(0, 1, 0), z_dir=(-0.3937507615, 0, 0.9192172419))):
        with BuildLine():
            ThreePointArc((-7.62, -16.7962627849), (-11.2121024484, -15.3083652333), (-12.7, -11.7162627849))
            Line((-12.7, -11.7162627849), (-12.7, -16.7962627849))
            Line((-12.7, -16.7962627849), (-7.62, -16.7962627849))
        make_face()
    extrude(amount=F2_T124_DEPTH)

    split(bisect_by=Plane.XY.offset(22.2720243037), keep=Keep.BOTTOM)


with BuildPart() as f2_tool118_1:
    add(f2_tool118.part)

    # F2_t126: intersect F2_tool122
    add(f2_tool122.part, mode=Mode.INTERSECT)


with BuildPart() as f1_22:
    add(f1_21.part)

    # F2_t116: cut F2_tool118
    add(f2_tool118_1.part, mode=Mode.SUBTRACT)


with BuildPart() as f2_tool129:
    # F2_s130 → F2_t131 (new body)
    with BuildSketch(Plane(origin=(20.7924554538, 0, 47.4051976742), x_dir=(0, 1, 0), z_dir=(-0.40167287, 0, -0.9157832197))):
        with BuildLine():
            ThreePointArc((-7.62, -17.1341969008), (-11.2121024484, -15.6462993492), (-12.7, -12.0541969008))
            Line((-12.7, -12.0541969008), (-12.7, -17.1341969008))
            Line((-12.7, -17.1341969008), (-7.62, -17.1341969008))
        make_face()
    extrude(amount=F2_T131_DEPTH)

    split(bisect_by=Plane.XY.offset(22.2720243037), keep=Keep.BOTTOM)


with BuildPart() as f2_tool133:
    # F2_s134 → F2_t135 (new body)
    with BuildSketch(Plane.YZ.offset(3.7588785618)):
        with BuildLine():
            ThreePointArc((-7.62, 22.2720243037), (-11.2121024484, 20.7841267521), (-12.7, 17.1920243037))
            Line((-12.7, 17.1920243037), (-12.7, 22.2720243037))
            Line((-12.7, 22.2720243037), (-7.62, 22.2720243037))
        make_face()
    extrude(amount=-F2_T135_DEPTH)

    split(bisect_by=Plane(origin=(-15.6912100052, 0, 6.8823420438), x_dir=(0, 1, 0), z_dir=(0.9157832197, 0, -0.40167287)), keep=Keep.TOP)


with BuildPart() as f2_tool129_1:
    add(f2_tool129.part)

    # F2_t137: intersect F2_tool133
    add(f2_tool133.part, mode=Mode.INTERSECT)


with BuildPart() as f1_23:
    add(f1_22.part)

    # F2_t127: cut F2_tool129
    add(f2_tool129_1.part, mode=Mode.SUBTRACT)


with BuildPart() as f2_tool140:
    # F2_s141 → F2_t142 (new body)
    with BuildSketch(Plane(origin=(-29.4427441593, 0, 35.1940583308), x_dir=(0, 1, 0), z_dir=(0.6416541085, 0, -0.7669941362))):
        with BuildLine():
            ThreePointArc((-7.62, -4.9578245582), (-11.2121024484, -3.4699270066), (-12.7, 0.1221754418))
            Line((-12.7, 0.1221754418), (-12.7, -4.9578245582))
            Line((-12.7, -4.9578245582), (-7.62, -4.9578245582))
        make_face()
    extrude(amount=F2_T142_DEPTH)

    split(bisect_by=Plane(origin=(-16.6361796063, 0, 3.9839540936), x_dir=(0, 1, 0), z_dir=(0.9725029779, 0, -0.2328904419)), keep=Keep.TOP)


with BuildPart() as f2_tool144:
    # F2_s145 → F2_t146 (new body)
    with BuildSketch(Plane(origin=(4.4797869241, 0, 18.7066763614), x_dir=(0, 1, 0), z_dir=(-0.2328904419, 0, -0.9725029779))):
        with BuildLine():
            ThreePointArc((-7.62, -17.1065590378), (-11.2121024484, -15.6186614862), (-12.7, -12.0265590378))
            Line((-12.7, -12.0265590378), (-12.7, -17.1065590378))
            Line((-12.7, -17.1065590378), (-7.62, -17.1065590378))
        make_face()
    extrude(amount=F2_T146_DEPTH)

    split(bisect_by=Plane(origin=(-3.8026223645, 0, -3.1812084972), x_dir=(0, 1, 0), z_dir=(0.7669941362, 0, 0.6416541085)), keep=Keep.TOP)


with BuildPart() as f2_tool140_1:
    add(f2_tool140.part)

    # F2_t148: intersect F2_tool144
    add(f2_tool144.part, mode=Mode.INTERSECT)


with BuildPart() as f1_24:
    add(f1_23.part)

    # F2_t138: cut F2_tool140
    add(f2_tool140_1.part, mode=Mode.SUBTRACT)


with BuildPart() as f2_tool151:
    # F2_s152 → F2_t153 (new body)
    with BuildSketch(Plane(origin=(-31.2630993995, 0, -13.0281005893), x_dir=(0, 1, 0), z_dir=(0.9230579574, 0, 0.384660899))):
        with BuildLine():
            ThreePointArc((-7.62, 0), (-11.2121024484, 1.4878975516), (-12.7, 5.08))
            Line((-12.7, 5.08), (-12.7, 0))
            Line((-12.7, 0), (-7.62, 0))
        make_face()
    extrude(amount=F2_T153_DEPTH)

    split(bisect_by=Plane(origin=(0, 0, 0), x_dir=(0, 1, 0), z_dir=(0.4147321912, 0, 0.90994352)), keep=Keep.TOP)


with BuildPart() as f2_tool155:
    # F2_s156 → F2_t157 (new body)
    with BuildSketch(Plane(origin=(-11.556282704, 0, 5.2670988281), x_dir=(0, 1, 0), z_dir=(0.90994352, 0, -0.4147321912))):
        with BuildLine():
            ThreePointArc((-7.62, 0), (-11.2121024484, 1.4878975516), (-12.7, 5.08))
            Line((-12.7, 5.08), (-12.7, 0))
            Line((-12.7, 0), (-7.62, 0))
        make_face()
    extrude(amount=F2_T157_DEPTH)

    split(bisect_by=Plane(origin=(0, 0, 0), x_dir=(0, 1, 0), z_dir=(-0.384660899, 0, 0.9230579574)), keep=Keep.TOP)


with BuildPart() as f2_tool151_1:
    add(f2_tool151.part)

    # F2_t159: intersect F2_tool155
    add(f2_tool155.part, mode=Mode.INTERSECT)


with BuildPart() as f1_25:
    add(f1_24.part)

    # F2_t149: cut F2_tool151
    add(f2_tool151_1.part, mode=Mode.SUBTRACT)


with BuildPart() as f2_tool162:
    # F2_s163 → F2_t164 (new body)
    with BuildSketch(Plane(origin=(3.2473042237, 0, -23.0298295556), x_dir=(0, 1, 0), z_dir=(-0.1396230906, 0, 0.9902047226))):
        with BuildLine():
            ThreePointArc((-5.08, -16.5540126433), (-1.4878975516, -15.0661150917), (0, -11.4740126433))
            Line((0, -11.4740126433), (0, -16.5540126433))
            Line((0, -16.5540126433), (-5.08, -16.5540126433))
        make_face()
    extrude(amount=F2_T164_DEPTH)

    split(bisect_by=Plane(origin=(4.0252181101, 0, -3.3991571169), x_dir=(0, 1, 0), z_dir=(-0.7640220521, 0, 0.64519013)), keep=Keep.TOP)


with BuildPart() as f2_tool166:
    # F2_s167 → F2_t168 (new body)
    with BuildSketch(Plane(origin=(3.0932592707, 0, 3.6629796175), x_dir=(0, 1, 0), z_dir=(0.64519013, 0, 0.7640220521))):
        with BuildLine():
            ThreePointArc((-5.08, -5.2684580229), (-1.4878975516, -3.7805604713), (0, -0.1884580229))
            Line((0, -0.1884580229), (0, -5.2684580229))
            Line((0, -5.2684580229), (-5.08, -5.2684580229))
        make_face()
    extrude(amount=F2_T168_DEPTH)

    split(bisect_by=Plane(origin=(16.3918614967, 0, 2.3113224066), x_dir=(0, 1, 0), z_dir=(-0.9902047226, 0, -0.1396230906)), keep=Keep.TOP)


with BuildPart() as f2_tool162_1:
    add(f2_tool162.part)

    # F2_t170: intersect F2_tool166
    add(f2_tool166.part, mode=Mode.INTERSECT)


with BuildPart() as f1_26:
    add(f1_25.part)

    # F2_t160: cut F2_tool162
    add(f2_tool162_1.part, mode=Mode.SUBTRACT)


with BuildPart() as f2_tool173:
    # F2_s174 → F2_t175 (new body)
    with BuildSketch(Plane.YZ.offset(38.4036406547)):
        with BuildLine():
            ThreePointArc((-5.08, 22.2720243037), (-1.4878975516, 20.7841267521), (0, 17.1920243037))
            Line((0, 17.1920243037), (0, 22.2720243037))
            Line((0, 22.2720243037), (-5.08, 22.2720243037))
        make_face()
    extrude(amount=-F2_T175_DEPTH)

    split(bisect_by=Plane(origin=(15.4394143514, 0, 6.6135412622), x_dir=(0, 1, 0), z_dir=(-0.9192172419, 0, -0.3937507615)), keep=Keep.TOP)


with BuildPart() as f2_tool177:
    # F2_s178 → F2_t179 (new body)
    with BuildSketch(Plane(origin=(-1.706745631, 0, 3.9844240694), x_dir=(0, 1, 0), z_dir=(-0.3937507615, 0, 0.9192172419))):
        with BuildLine():
            ThreePointArc((-5.08, -16.7962627849), (-1.4878975516, -15.3083652333), (0, -11.7162627849))
            Line((0, -11.7162627849), (0, -16.7962627849))
            Line((0, -16.7962627849), (-5.08, -16.7962627849))
        make_face()
    extrude(amount=F2_T179_DEPTH)

    split(bisect_by=Plane.XY.offset(22.2720243037), keep=Keep.BOTTOM)


with BuildPart() as f2_tool173_1:
    add(f2_tool173.part)

    # F2_t181: intersect F2_tool177
    add(f2_tool177.part, mode=Mode.INTERSECT)


with BuildPart() as f1_27:
    add(f1_26.part)

    # F2_t171: cut F2_tool173
    add(f2_tool173_1.part, mode=Mode.SUBTRACT)


with BuildPart() as f2_tool184:
    # F2_s185 → F2_t186 (new body)
    with BuildSketch(Plane(origin=(20.7924554538, 0, 47.4051976742), x_dir=(0, 1, 0), z_dir=(-0.40167287, 0, -0.9157832197))):
        with BuildLine():
            ThreePointArc((-5.08, -17.1341969008), (-1.4878975516, -15.6462993492), (0, -12.0541969008))
            Line((0, -12.0541969008), (0, -17.1341969008))
            Line((0, -17.1341969008), (-5.08, -17.1341969008))
        make_face()
    extrude(amount=F2_T186_DEPTH)

    split(bisect_by=Plane.XY.offset(22.2720243037), keep=Keep.BOTTOM)


with BuildPart() as f2_tool188:
    # F2_s189 → F2_t190 (new body)
    with BuildSketch(Plane.YZ.offset(3.7588785618)):
        with BuildLine():
            ThreePointArc((-5.08, 22.2720243037), (-1.4878975516, 20.7841267521), (0, 17.1920243037))
            Line((0, 17.1920243037), (0, 22.2720243037))
            Line((0, 22.2720243037), (-5.08, 22.2720243037))
        make_face()
    extrude(amount=-F2_T190_DEPTH)

    split(bisect_by=Plane(origin=(-15.6912100052, 0, 6.8823420438), x_dir=(0, 1, 0), z_dir=(0.9157832197, 0, -0.40167287)), keep=Keep.TOP)


with BuildPart() as f2_tool184_1:
    add(f2_tool184.part)

    # F2_t192: intersect F2_tool188
    add(f2_tool188.part, mode=Mode.INTERSECT)


with BuildPart() as f1_28:
    add(f1_27.part)

    # F2_t182: cut F2_tool184
    add(f2_tool184_1.part, mode=Mode.SUBTRACT)


with BuildPart() as f2_tool195:
    # F2_s196 → F2_t197 (new body)
    with BuildSketch(Plane(origin=(-29.4427441593, 0, 35.1940583308), x_dir=(0, 1, 0), z_dir=(0.6416541085, 0, -0.7669941362))):
        with BuildLine():
            ThreePointArc((-5.08, -4.9578245582), (-1.4878975516, -3.4699270066), (0, 0.1221754418))
            Line((0, 0.1221754418), (0, -4.9578245582))
            Line((0, -4.9578245582), (-5.08, -4.9578245582))
        make_face()
    extrude(amount=F2_T197_DEPTH)

    split(bisect_by=Plane(origin=(-16.6361796063, 0, 3.9839540936), x_dir=(0, 1, 0), z_dir=(0.9725029779, 0, -0.2328904419)), keep=Keep.TOP)


with BuildPart() as f2_tool199:
    # F2_s200 → F2_t201 (new body)
    with BuildSketch(Plane(origin=(4.4797869241, 0, 18.7066763614), x_dir=(0, 1, 0), z_dir=(-0.2328904419, 0, -0.9725029779))):
        with BuildLine():
            ThreePointArc((-5.08, -17.1065590378), (-1.4878975516, -15.6186614862), (0, -12.0265590378))
            Line((0, -12.0265590378), (0, -17.1065590378))
            Line((0, -17.1065590378), (-5.08, -17.1065590378))
        make_face()
    extrude(amount=F2_T201_DEPTH)

    split(bisect_by=Plane(origin=(-3.8026223645, 0, -3.1812084972), x_dir=(0, 1, 0), z_dir=(0.7669941362, 0, 0.6416541085)), keep=Keep.TOP)


with BuildPart() as f2_tool195_1:
    add(f2_tool195.part)

    # F2_t203: intersect F2_tool199
    add(f2_tool199.part, mode=Mode.INTERSECT)


with BuildPart() as f1_29:
    add(f1_28.part)

    # F2_t193: cut F2_tool195
    add(f2_tool195_1.part, mode=Mode.SUBTRACT)


with BuildPart() as f2_tool206:
    # F2_s207 → F2_t208 (new body)
    with BuildSketch(Plane(origin=(-31.2630993995, 0, -13.0281005893), x_dir=(0, 1, 0), z_dir=(0.9230579574, 0, 0.384660899))):
        with BuildLine():
            ThreePointArc((-5.08, 0), (-1.4878975516, 1.4878975516), (0, 5.08))
            Line((0, 5.08), (0, 0))
            Line((0, 0), (-5.08, 0))
        make_face()
    extrude(amount=F2_T208_DEPTH)

    split(bisect_by=Plane(origin=(0, 0, 0), x_dir=(0, 1, 0), z_dir=(0.4147321912, 0, 0.90994352)), keep=Keep.TOP)


with BuildPart() as f2_tool210:
    # F2_s211 → F2_t212 (new body)
    with BuildSketch(Plane(origin=(-11.556282704, 0, 5.2670988281), x_dir=(0, 1, 0), z_dir=(0.90994352, 0, -0.4147321912))):
        with BuildLine():
            ThreePointArc((-5.08, 0), (-1.4878975516, 1.4878975516), (0, 5.08))
            Line((0, 5.08), (0, 0))
            Line((0, 0), (-5.08, 0))
        make_face()
    extrude(amount=F2_T212_DEPTH)

    split(bisect_by=Plane(origin=(0, 0, 0), x_dir=(0, 1, 0), z_dir=(-0.384660899, 0, 0.9230579574)), keep=Keep.TOP)


with BuildPart() as f2_tool206_1:
    add(f2_tool206.part)

    # F2_t214: intersect F2_tool210
    add(f2_tool210.part, mode=Mode.INTERSECT)


with BuildPart() as f1_30:
    add(f1_29.part)

    # F2_t204: cut F2_tool206
    add(f2_tool206_1.part, mode=Mode.SUBTRACT)


solid = f1_30.part
